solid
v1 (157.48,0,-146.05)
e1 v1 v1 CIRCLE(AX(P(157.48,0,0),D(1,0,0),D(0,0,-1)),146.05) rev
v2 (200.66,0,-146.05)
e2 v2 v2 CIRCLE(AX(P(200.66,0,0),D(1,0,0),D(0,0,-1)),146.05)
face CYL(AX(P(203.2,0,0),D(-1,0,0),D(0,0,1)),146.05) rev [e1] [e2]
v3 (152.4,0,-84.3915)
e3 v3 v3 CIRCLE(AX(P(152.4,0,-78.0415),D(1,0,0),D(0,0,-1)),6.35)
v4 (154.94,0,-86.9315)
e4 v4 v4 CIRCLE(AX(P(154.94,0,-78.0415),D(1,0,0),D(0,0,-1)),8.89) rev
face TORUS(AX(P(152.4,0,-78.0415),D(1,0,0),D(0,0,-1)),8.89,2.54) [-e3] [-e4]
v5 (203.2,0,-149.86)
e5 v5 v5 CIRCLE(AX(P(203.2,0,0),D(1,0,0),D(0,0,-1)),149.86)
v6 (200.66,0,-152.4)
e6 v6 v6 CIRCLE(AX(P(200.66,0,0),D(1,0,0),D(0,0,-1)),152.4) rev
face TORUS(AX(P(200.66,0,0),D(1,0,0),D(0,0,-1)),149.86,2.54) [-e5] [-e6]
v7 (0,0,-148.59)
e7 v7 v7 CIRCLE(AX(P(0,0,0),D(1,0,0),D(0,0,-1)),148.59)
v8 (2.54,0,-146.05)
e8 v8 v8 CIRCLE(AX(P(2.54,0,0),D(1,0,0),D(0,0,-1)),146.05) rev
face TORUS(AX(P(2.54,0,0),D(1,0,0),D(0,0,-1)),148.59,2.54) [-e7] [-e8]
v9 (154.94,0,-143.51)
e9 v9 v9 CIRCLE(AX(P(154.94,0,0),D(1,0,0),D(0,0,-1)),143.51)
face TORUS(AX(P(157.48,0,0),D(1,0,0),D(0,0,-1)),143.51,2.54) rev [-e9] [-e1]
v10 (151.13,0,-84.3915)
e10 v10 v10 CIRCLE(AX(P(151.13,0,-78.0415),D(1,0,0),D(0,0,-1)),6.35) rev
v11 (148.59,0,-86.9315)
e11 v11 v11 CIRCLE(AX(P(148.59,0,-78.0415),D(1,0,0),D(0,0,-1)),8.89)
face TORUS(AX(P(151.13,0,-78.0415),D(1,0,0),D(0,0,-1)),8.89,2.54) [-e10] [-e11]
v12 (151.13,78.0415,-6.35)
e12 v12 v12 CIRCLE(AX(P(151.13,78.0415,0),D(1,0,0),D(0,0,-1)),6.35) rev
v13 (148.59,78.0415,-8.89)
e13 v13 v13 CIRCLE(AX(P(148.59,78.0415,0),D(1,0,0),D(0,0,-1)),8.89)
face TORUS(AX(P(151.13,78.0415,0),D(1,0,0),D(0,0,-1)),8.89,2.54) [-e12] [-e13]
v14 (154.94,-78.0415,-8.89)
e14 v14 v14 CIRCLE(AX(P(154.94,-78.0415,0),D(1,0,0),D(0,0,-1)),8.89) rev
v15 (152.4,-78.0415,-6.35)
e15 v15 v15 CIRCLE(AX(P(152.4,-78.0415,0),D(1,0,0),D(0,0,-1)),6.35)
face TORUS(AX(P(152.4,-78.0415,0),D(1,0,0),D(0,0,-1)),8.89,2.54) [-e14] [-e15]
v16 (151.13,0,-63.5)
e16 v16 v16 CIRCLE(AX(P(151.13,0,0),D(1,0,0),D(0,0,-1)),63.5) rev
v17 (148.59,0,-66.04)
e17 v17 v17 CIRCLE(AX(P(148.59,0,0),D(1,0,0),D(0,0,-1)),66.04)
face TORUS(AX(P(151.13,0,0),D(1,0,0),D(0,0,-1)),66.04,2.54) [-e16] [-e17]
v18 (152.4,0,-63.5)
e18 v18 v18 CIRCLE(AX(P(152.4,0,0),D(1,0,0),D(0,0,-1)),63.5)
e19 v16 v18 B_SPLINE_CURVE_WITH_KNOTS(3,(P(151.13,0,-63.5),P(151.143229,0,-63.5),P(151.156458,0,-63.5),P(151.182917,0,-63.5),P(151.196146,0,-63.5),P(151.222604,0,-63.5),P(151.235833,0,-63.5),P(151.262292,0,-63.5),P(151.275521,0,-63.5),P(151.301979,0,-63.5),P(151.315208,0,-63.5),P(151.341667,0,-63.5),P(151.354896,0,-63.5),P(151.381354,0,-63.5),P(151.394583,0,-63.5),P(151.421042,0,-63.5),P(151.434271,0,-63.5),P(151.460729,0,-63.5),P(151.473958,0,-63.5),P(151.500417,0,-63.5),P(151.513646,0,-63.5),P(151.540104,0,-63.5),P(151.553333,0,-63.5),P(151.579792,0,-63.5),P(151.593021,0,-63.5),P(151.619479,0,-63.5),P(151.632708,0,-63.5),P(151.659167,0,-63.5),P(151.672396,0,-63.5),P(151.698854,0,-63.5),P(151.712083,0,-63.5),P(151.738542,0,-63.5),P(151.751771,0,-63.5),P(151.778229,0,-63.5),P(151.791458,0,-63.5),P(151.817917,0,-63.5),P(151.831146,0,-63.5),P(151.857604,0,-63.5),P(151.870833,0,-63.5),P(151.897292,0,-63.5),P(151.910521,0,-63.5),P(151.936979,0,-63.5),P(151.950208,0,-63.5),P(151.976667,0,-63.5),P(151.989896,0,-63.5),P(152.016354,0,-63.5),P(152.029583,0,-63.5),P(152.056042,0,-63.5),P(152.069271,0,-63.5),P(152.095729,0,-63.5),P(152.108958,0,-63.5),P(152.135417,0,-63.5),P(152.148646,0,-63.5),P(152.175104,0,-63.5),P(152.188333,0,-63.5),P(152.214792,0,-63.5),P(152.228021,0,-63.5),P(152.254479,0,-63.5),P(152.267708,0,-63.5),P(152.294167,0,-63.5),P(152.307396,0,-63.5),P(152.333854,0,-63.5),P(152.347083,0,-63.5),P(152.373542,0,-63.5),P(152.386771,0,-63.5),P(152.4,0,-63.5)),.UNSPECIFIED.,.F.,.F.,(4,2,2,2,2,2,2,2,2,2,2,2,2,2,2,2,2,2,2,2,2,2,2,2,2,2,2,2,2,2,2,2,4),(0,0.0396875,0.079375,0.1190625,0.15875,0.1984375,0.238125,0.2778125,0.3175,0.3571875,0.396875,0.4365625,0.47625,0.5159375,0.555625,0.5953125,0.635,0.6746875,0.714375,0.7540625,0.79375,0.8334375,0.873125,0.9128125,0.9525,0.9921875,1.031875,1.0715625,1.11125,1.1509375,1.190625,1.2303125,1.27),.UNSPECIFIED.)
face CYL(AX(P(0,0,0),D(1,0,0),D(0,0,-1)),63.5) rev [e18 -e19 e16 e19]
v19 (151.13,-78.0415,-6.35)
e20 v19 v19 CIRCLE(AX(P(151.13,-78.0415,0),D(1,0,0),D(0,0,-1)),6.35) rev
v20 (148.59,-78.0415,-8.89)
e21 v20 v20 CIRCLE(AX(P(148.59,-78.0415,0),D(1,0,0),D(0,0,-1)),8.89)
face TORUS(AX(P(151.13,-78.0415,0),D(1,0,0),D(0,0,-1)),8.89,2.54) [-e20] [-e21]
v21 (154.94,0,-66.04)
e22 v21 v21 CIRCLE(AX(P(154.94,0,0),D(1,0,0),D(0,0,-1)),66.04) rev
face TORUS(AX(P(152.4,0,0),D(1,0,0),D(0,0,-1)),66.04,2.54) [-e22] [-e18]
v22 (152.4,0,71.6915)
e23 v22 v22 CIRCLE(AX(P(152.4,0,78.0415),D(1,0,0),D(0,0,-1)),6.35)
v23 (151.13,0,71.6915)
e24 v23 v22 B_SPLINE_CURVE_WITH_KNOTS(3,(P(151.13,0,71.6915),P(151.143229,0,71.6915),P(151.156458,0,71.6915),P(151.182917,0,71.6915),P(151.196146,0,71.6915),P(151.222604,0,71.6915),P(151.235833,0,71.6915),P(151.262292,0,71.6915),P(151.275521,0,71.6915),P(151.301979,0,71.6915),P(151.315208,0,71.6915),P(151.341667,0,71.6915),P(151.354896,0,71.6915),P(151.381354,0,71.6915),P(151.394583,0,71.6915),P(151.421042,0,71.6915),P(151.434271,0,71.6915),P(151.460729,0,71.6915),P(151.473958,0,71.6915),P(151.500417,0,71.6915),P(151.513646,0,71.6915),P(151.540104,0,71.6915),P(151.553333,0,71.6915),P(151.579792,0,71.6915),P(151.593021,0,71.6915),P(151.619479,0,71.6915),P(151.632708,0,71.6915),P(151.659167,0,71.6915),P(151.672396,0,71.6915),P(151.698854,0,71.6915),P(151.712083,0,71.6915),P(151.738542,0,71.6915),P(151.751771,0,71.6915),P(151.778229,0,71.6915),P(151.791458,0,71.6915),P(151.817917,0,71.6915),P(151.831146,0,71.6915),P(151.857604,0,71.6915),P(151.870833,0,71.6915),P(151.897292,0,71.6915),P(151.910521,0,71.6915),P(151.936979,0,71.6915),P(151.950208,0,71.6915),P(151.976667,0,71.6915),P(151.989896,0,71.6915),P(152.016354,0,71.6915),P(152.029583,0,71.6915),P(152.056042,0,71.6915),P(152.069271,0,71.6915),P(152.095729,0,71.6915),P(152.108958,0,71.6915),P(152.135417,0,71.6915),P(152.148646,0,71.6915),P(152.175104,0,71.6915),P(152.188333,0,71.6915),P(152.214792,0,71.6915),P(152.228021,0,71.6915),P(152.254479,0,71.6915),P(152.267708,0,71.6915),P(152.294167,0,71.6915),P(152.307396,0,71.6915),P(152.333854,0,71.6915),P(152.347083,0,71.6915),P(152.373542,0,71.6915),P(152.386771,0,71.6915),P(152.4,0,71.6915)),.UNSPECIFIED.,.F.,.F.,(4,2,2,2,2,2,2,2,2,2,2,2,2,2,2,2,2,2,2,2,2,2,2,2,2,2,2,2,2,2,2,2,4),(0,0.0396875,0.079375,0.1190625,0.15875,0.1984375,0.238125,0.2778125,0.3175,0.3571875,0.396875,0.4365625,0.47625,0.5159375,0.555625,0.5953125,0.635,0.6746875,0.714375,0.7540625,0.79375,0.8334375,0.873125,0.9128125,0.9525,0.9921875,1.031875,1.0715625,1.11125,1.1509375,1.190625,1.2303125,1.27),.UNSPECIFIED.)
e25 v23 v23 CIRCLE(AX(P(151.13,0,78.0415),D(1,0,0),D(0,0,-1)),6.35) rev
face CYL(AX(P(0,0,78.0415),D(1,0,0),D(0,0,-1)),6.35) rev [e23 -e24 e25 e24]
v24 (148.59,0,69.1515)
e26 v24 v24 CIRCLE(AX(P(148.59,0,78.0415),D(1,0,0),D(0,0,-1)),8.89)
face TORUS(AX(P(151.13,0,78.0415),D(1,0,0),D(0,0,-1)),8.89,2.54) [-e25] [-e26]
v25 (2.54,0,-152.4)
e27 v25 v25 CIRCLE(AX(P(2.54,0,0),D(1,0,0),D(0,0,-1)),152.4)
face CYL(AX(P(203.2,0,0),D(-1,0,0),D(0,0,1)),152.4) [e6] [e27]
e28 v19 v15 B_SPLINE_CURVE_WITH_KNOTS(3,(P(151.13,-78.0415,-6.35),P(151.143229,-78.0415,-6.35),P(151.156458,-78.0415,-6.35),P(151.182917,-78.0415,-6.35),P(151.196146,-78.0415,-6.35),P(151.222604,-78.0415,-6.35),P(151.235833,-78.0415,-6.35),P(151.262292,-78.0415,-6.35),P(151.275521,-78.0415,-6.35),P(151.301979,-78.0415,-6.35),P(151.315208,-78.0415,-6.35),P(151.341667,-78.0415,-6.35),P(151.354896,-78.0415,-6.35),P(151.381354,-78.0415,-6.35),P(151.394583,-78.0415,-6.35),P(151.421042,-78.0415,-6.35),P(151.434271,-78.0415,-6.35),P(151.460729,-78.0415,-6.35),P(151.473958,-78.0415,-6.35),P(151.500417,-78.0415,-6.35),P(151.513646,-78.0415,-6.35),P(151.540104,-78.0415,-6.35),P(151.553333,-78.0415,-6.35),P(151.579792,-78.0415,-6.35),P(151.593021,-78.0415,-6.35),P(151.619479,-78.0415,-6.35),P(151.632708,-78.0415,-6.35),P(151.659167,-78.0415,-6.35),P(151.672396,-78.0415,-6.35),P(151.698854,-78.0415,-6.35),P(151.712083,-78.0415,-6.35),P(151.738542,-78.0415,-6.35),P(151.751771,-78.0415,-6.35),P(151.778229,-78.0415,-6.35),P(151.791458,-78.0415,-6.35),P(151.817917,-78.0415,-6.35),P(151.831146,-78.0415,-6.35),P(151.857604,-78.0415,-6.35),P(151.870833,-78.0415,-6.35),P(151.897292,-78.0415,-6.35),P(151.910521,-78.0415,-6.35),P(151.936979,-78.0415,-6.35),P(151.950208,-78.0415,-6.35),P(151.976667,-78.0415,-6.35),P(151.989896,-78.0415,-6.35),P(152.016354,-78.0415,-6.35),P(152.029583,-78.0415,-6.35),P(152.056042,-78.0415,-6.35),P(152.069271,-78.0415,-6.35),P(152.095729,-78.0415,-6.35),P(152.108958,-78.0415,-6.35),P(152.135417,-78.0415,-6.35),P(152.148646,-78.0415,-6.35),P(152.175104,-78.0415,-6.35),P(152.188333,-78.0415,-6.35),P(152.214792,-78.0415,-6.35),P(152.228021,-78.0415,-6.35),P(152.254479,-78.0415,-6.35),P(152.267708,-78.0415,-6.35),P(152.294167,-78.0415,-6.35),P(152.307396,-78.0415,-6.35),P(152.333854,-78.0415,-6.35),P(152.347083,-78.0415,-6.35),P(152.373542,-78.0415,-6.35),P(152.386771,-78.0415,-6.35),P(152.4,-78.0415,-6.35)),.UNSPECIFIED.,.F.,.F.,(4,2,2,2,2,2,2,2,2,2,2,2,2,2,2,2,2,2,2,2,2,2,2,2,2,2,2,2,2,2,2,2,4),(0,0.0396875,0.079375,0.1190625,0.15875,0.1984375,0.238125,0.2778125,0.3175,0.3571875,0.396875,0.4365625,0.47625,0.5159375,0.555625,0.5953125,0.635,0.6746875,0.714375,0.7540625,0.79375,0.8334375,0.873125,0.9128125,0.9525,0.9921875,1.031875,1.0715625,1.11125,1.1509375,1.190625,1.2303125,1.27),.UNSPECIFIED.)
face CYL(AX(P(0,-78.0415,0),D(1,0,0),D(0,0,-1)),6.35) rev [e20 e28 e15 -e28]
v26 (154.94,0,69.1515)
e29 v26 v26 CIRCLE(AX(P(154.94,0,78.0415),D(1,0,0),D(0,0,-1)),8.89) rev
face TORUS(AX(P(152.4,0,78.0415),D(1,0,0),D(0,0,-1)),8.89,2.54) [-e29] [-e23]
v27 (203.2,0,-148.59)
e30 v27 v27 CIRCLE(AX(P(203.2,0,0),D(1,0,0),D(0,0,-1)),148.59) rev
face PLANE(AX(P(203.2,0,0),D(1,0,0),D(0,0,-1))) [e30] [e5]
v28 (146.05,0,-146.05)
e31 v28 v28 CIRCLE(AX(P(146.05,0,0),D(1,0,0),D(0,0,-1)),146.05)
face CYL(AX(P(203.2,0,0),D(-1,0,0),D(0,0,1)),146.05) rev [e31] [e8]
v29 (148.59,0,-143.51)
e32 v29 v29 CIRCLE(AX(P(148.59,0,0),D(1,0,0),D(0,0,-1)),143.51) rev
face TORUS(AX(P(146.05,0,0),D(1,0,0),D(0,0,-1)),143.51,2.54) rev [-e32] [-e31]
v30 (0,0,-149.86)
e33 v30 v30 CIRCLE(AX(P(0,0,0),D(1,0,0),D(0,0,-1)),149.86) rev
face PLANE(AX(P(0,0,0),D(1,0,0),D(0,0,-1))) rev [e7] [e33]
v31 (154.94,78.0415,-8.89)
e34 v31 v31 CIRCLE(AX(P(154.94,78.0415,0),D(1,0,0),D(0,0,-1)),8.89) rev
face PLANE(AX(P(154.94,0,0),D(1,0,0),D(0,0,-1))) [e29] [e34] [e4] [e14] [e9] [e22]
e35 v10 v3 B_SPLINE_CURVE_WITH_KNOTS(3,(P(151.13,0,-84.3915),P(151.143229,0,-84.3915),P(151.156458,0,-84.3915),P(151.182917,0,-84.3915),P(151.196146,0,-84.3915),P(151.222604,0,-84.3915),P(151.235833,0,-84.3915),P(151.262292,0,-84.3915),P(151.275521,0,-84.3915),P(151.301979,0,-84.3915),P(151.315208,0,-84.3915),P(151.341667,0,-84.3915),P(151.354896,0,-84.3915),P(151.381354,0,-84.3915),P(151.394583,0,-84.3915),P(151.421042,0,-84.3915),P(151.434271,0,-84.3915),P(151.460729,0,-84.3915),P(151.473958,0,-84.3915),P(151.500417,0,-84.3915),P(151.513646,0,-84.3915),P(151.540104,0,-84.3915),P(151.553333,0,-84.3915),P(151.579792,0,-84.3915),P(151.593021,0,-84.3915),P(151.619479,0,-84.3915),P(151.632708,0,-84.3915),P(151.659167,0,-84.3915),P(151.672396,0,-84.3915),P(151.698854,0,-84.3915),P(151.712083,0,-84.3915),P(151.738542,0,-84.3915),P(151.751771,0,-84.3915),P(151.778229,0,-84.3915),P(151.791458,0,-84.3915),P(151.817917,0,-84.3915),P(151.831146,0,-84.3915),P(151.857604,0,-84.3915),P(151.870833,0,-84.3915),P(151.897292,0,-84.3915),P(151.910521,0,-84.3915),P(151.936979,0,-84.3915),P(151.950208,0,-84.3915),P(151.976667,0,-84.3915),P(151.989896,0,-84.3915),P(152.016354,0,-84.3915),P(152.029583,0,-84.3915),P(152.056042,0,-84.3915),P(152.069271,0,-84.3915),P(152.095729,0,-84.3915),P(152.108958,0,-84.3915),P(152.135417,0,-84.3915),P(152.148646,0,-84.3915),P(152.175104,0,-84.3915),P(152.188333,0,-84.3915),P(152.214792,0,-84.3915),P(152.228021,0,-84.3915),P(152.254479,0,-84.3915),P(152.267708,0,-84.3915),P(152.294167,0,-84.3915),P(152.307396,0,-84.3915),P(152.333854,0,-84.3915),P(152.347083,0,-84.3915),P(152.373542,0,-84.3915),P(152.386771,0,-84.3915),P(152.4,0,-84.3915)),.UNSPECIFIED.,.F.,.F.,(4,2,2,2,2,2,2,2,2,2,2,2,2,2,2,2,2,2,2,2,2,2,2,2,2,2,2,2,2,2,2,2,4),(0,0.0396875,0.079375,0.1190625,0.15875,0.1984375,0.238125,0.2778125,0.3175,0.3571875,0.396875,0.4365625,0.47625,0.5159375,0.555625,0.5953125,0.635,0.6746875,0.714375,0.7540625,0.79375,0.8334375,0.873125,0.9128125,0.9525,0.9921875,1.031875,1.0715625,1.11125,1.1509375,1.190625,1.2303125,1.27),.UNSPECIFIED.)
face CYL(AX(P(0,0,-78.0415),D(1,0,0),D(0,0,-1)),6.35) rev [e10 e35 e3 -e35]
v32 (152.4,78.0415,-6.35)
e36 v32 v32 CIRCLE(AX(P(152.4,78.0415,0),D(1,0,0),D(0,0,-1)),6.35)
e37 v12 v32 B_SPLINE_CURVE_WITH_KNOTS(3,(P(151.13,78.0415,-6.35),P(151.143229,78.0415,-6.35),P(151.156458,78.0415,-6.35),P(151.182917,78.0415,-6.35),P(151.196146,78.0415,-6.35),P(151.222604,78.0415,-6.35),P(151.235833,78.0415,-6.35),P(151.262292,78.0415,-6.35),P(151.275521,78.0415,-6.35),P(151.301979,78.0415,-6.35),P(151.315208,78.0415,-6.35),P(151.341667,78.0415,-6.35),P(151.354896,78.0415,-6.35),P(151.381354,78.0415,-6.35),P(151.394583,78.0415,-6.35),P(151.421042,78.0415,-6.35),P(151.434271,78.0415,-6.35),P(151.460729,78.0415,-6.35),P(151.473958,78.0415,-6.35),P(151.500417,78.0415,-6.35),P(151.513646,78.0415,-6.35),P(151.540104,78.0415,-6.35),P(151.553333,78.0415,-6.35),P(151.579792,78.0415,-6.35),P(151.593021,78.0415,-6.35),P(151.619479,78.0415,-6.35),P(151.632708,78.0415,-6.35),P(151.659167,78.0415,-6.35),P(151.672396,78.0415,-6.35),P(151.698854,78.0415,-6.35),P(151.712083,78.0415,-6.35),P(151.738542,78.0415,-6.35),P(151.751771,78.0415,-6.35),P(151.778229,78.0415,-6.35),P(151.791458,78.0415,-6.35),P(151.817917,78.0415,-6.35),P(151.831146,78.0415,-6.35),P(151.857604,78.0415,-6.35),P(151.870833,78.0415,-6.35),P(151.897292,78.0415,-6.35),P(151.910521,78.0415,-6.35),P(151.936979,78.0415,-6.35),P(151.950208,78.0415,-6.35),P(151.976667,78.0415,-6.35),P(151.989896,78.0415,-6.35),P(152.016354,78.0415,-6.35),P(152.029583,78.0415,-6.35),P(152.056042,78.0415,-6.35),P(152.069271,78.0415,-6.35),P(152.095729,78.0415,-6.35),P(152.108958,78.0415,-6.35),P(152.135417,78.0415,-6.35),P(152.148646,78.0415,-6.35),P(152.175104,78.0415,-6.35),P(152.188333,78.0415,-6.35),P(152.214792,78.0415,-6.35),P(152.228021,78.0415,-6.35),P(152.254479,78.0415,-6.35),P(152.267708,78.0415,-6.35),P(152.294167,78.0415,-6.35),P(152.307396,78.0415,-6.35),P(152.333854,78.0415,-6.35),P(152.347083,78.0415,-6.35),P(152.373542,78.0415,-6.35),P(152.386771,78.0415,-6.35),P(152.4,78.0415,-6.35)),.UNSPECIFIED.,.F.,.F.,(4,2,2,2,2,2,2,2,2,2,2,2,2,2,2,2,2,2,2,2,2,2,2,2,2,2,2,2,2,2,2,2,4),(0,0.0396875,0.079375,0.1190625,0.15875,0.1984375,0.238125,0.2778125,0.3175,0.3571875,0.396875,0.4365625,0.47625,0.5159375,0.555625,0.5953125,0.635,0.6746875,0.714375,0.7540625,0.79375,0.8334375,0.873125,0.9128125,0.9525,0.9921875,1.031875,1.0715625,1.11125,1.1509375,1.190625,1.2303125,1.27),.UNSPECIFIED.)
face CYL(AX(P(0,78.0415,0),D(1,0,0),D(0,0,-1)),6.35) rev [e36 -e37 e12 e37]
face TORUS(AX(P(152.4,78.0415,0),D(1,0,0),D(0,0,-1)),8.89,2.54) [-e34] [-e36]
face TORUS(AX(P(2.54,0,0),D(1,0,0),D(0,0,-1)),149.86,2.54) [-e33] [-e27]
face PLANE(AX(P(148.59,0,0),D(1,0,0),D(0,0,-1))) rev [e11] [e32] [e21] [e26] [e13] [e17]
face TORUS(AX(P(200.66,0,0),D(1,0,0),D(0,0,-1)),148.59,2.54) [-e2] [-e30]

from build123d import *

# Parameters (mm, degrees)
SKETCH1_R                = 152.4
SKETCH1_R_2              = 146.05
BOSS_EXTRUDE1_DEPTH      = 203.2
FILLET3_R                = 2.54
FILLET4_R                = 2.54
BOSS_EXTRUDE2_DEPTH      = 2.54
BOSS_EXTRUDE2_DEPTH_BACK = 3.81
SKETCH2_R                = 146.05
FILLET5_R                = 2.54
FILLET6_R                = 2.54
CUT_EXTRUDE1_DEPTH       = 264.964543073
CUT_EXTRUDE1_DEPTH_BACK  = 264.964543073
SKETCH3_R                = 6.35
CUT_EXTRUDE3_DEPTH       = 264.964543073
CUT_EXTRUDE3_DEPTH_BACK  = 264.964543073
SKETCH4_R                = 63.5
FILLET7_R                = 2.54
FILLET8_R                = 2.54


with BuildPart() as part:
    # Sketch1 → Boss-Extrude1 (new body)
    with BuildSketch(Plane(origin=(0, 0, 0), x_dir=(0, 0, -1), z_dir=(1, 0, 0))):
        Circle(SKETCH1_R)
        Circle(SKETCH1_R_2, mode=Mode.SUBTRACT)
    extrude(amount=BOSS_EXTRUDE1_DEPTH)

    # Fillet3
    fillet3_edges = [part.edges().sort_by_distance(p)[0] for p in [
        (203.2, 0, 152.4),
        (203.2, 0, 146.05),
    ]]
    fillet(fillet3_edges, radius=FILLET3_R)

    # Fillet4
    fillet4_edges = [part.edges().sort_by_distance(p)[0] for p in [
        (0, 0, 152.4),
        (0, 0, 146.05),
    ]]
    fillet(fillet4_edges, radius=FILLET4_R)

    # Sketch2 → Boss-Extrude2 (add, two sides: drawn at the far end of the back side and taken through both)
    with BuildSketch(Plane(origin=(152.4, 0, 0), x_dir=(0, 0, -1), z_dir=(1, 0, 0)).offset(-BOSS_EXTRUDE2_DEPTH_BACK)):
        Circle(SKETCH2_R)
    extrude(amount=BOSS_EXTRUDE2_DEPTH + BOSS_EXTRUDE2_DEPTH_BACK)

    # Fillet5
    fillet5_edges = [part.edges().sort_by_distance(p)[0] for p in [
        (148.59, 0, 146.05),
    ]]
    fillet(fillet5_edges, radius=FILLET5_R)

    # Fillet6
    fillet6_edges = [part.edges().sort_by_distance(p)[0] for p in [
        (154.94, 0, 146.05),
    ]]
    fillet(fillet6_edges, radius=FILLET6_R)

    # Sketch3 → Cut-Extrude1 (cut, two sides: drawn at the far end of the back side and taken through both)
    with BuildSketch(Plane(origin=(152.4, 0, 0), x_dir=(0, 0, -1), z_dir=(1, 0, 0)).offset(-CUT_EXTRUDE1_DEPTH_BACK)):
        with Locations((0, 78.0415)):
            Circle(SKETCH3_R)
        with Locations((0, -78.0415)):
            Circle(SKETCH3_R)
        with Locations((78.0415, 0)):
            Circle(SKETCH3_R)
        with Locations((-78.0415, 0)):
            Circle(SKETCH3_R)
    extrude(amount=CUT_EXTRUDE1_DEPTH + CUT_EXTRUDE1_DEPTH_BACK, mode=Mode.SUBTRACT)

    # Sketch4 → Cut-Extrude3 (cut, two sides: drawn at the far end of the back side and taken through both)
    with BuildSketch(Plane(origin=(152.4, 0, 0), x_dir=(0, 0, -1), z_dir=(1, 0, 0)).offset(-CUT_EXTRUDE3_DEPTH_BACK)):
        Circle(SKETCH4_R)
    extrude(amount=CUT_EXTRUDE3_DEPTH + CUT_EXTRUDE3_DEPTH_BACK, mode=Mode.SUBTRACT)

    # Fillet7
    fillet7_edges = [part.edges().sort_by_distance(p)[0] for p in [
        (154.94, 78.0415, 6.35),
        (154.94, -78.0415, 6.35),
        (154.94, 0, -71.6915),
        (154.94, 0, 84.3915),
        (154.94, 0, 63.5),
    ]]
    fillet(fillet7_edges, radius=FILLET7_R - 0.0001)  # a hair under: the kernel refuses the full size

    # Fillet8
    fillet8_edges = [part.edges().sort_by_distance(p)[0] for p in [
        (148.59, 78.0415, 6.35),
        (148.59, -78.0415, 6.35),
        (148.59, 0, -71.6915),
        (148.59, 0, 84.3915),
        (148.59, 0, 63.5),
    ]]
    fillet(fillet8_edges, radius=FILLET8_R)


solid = part.part
